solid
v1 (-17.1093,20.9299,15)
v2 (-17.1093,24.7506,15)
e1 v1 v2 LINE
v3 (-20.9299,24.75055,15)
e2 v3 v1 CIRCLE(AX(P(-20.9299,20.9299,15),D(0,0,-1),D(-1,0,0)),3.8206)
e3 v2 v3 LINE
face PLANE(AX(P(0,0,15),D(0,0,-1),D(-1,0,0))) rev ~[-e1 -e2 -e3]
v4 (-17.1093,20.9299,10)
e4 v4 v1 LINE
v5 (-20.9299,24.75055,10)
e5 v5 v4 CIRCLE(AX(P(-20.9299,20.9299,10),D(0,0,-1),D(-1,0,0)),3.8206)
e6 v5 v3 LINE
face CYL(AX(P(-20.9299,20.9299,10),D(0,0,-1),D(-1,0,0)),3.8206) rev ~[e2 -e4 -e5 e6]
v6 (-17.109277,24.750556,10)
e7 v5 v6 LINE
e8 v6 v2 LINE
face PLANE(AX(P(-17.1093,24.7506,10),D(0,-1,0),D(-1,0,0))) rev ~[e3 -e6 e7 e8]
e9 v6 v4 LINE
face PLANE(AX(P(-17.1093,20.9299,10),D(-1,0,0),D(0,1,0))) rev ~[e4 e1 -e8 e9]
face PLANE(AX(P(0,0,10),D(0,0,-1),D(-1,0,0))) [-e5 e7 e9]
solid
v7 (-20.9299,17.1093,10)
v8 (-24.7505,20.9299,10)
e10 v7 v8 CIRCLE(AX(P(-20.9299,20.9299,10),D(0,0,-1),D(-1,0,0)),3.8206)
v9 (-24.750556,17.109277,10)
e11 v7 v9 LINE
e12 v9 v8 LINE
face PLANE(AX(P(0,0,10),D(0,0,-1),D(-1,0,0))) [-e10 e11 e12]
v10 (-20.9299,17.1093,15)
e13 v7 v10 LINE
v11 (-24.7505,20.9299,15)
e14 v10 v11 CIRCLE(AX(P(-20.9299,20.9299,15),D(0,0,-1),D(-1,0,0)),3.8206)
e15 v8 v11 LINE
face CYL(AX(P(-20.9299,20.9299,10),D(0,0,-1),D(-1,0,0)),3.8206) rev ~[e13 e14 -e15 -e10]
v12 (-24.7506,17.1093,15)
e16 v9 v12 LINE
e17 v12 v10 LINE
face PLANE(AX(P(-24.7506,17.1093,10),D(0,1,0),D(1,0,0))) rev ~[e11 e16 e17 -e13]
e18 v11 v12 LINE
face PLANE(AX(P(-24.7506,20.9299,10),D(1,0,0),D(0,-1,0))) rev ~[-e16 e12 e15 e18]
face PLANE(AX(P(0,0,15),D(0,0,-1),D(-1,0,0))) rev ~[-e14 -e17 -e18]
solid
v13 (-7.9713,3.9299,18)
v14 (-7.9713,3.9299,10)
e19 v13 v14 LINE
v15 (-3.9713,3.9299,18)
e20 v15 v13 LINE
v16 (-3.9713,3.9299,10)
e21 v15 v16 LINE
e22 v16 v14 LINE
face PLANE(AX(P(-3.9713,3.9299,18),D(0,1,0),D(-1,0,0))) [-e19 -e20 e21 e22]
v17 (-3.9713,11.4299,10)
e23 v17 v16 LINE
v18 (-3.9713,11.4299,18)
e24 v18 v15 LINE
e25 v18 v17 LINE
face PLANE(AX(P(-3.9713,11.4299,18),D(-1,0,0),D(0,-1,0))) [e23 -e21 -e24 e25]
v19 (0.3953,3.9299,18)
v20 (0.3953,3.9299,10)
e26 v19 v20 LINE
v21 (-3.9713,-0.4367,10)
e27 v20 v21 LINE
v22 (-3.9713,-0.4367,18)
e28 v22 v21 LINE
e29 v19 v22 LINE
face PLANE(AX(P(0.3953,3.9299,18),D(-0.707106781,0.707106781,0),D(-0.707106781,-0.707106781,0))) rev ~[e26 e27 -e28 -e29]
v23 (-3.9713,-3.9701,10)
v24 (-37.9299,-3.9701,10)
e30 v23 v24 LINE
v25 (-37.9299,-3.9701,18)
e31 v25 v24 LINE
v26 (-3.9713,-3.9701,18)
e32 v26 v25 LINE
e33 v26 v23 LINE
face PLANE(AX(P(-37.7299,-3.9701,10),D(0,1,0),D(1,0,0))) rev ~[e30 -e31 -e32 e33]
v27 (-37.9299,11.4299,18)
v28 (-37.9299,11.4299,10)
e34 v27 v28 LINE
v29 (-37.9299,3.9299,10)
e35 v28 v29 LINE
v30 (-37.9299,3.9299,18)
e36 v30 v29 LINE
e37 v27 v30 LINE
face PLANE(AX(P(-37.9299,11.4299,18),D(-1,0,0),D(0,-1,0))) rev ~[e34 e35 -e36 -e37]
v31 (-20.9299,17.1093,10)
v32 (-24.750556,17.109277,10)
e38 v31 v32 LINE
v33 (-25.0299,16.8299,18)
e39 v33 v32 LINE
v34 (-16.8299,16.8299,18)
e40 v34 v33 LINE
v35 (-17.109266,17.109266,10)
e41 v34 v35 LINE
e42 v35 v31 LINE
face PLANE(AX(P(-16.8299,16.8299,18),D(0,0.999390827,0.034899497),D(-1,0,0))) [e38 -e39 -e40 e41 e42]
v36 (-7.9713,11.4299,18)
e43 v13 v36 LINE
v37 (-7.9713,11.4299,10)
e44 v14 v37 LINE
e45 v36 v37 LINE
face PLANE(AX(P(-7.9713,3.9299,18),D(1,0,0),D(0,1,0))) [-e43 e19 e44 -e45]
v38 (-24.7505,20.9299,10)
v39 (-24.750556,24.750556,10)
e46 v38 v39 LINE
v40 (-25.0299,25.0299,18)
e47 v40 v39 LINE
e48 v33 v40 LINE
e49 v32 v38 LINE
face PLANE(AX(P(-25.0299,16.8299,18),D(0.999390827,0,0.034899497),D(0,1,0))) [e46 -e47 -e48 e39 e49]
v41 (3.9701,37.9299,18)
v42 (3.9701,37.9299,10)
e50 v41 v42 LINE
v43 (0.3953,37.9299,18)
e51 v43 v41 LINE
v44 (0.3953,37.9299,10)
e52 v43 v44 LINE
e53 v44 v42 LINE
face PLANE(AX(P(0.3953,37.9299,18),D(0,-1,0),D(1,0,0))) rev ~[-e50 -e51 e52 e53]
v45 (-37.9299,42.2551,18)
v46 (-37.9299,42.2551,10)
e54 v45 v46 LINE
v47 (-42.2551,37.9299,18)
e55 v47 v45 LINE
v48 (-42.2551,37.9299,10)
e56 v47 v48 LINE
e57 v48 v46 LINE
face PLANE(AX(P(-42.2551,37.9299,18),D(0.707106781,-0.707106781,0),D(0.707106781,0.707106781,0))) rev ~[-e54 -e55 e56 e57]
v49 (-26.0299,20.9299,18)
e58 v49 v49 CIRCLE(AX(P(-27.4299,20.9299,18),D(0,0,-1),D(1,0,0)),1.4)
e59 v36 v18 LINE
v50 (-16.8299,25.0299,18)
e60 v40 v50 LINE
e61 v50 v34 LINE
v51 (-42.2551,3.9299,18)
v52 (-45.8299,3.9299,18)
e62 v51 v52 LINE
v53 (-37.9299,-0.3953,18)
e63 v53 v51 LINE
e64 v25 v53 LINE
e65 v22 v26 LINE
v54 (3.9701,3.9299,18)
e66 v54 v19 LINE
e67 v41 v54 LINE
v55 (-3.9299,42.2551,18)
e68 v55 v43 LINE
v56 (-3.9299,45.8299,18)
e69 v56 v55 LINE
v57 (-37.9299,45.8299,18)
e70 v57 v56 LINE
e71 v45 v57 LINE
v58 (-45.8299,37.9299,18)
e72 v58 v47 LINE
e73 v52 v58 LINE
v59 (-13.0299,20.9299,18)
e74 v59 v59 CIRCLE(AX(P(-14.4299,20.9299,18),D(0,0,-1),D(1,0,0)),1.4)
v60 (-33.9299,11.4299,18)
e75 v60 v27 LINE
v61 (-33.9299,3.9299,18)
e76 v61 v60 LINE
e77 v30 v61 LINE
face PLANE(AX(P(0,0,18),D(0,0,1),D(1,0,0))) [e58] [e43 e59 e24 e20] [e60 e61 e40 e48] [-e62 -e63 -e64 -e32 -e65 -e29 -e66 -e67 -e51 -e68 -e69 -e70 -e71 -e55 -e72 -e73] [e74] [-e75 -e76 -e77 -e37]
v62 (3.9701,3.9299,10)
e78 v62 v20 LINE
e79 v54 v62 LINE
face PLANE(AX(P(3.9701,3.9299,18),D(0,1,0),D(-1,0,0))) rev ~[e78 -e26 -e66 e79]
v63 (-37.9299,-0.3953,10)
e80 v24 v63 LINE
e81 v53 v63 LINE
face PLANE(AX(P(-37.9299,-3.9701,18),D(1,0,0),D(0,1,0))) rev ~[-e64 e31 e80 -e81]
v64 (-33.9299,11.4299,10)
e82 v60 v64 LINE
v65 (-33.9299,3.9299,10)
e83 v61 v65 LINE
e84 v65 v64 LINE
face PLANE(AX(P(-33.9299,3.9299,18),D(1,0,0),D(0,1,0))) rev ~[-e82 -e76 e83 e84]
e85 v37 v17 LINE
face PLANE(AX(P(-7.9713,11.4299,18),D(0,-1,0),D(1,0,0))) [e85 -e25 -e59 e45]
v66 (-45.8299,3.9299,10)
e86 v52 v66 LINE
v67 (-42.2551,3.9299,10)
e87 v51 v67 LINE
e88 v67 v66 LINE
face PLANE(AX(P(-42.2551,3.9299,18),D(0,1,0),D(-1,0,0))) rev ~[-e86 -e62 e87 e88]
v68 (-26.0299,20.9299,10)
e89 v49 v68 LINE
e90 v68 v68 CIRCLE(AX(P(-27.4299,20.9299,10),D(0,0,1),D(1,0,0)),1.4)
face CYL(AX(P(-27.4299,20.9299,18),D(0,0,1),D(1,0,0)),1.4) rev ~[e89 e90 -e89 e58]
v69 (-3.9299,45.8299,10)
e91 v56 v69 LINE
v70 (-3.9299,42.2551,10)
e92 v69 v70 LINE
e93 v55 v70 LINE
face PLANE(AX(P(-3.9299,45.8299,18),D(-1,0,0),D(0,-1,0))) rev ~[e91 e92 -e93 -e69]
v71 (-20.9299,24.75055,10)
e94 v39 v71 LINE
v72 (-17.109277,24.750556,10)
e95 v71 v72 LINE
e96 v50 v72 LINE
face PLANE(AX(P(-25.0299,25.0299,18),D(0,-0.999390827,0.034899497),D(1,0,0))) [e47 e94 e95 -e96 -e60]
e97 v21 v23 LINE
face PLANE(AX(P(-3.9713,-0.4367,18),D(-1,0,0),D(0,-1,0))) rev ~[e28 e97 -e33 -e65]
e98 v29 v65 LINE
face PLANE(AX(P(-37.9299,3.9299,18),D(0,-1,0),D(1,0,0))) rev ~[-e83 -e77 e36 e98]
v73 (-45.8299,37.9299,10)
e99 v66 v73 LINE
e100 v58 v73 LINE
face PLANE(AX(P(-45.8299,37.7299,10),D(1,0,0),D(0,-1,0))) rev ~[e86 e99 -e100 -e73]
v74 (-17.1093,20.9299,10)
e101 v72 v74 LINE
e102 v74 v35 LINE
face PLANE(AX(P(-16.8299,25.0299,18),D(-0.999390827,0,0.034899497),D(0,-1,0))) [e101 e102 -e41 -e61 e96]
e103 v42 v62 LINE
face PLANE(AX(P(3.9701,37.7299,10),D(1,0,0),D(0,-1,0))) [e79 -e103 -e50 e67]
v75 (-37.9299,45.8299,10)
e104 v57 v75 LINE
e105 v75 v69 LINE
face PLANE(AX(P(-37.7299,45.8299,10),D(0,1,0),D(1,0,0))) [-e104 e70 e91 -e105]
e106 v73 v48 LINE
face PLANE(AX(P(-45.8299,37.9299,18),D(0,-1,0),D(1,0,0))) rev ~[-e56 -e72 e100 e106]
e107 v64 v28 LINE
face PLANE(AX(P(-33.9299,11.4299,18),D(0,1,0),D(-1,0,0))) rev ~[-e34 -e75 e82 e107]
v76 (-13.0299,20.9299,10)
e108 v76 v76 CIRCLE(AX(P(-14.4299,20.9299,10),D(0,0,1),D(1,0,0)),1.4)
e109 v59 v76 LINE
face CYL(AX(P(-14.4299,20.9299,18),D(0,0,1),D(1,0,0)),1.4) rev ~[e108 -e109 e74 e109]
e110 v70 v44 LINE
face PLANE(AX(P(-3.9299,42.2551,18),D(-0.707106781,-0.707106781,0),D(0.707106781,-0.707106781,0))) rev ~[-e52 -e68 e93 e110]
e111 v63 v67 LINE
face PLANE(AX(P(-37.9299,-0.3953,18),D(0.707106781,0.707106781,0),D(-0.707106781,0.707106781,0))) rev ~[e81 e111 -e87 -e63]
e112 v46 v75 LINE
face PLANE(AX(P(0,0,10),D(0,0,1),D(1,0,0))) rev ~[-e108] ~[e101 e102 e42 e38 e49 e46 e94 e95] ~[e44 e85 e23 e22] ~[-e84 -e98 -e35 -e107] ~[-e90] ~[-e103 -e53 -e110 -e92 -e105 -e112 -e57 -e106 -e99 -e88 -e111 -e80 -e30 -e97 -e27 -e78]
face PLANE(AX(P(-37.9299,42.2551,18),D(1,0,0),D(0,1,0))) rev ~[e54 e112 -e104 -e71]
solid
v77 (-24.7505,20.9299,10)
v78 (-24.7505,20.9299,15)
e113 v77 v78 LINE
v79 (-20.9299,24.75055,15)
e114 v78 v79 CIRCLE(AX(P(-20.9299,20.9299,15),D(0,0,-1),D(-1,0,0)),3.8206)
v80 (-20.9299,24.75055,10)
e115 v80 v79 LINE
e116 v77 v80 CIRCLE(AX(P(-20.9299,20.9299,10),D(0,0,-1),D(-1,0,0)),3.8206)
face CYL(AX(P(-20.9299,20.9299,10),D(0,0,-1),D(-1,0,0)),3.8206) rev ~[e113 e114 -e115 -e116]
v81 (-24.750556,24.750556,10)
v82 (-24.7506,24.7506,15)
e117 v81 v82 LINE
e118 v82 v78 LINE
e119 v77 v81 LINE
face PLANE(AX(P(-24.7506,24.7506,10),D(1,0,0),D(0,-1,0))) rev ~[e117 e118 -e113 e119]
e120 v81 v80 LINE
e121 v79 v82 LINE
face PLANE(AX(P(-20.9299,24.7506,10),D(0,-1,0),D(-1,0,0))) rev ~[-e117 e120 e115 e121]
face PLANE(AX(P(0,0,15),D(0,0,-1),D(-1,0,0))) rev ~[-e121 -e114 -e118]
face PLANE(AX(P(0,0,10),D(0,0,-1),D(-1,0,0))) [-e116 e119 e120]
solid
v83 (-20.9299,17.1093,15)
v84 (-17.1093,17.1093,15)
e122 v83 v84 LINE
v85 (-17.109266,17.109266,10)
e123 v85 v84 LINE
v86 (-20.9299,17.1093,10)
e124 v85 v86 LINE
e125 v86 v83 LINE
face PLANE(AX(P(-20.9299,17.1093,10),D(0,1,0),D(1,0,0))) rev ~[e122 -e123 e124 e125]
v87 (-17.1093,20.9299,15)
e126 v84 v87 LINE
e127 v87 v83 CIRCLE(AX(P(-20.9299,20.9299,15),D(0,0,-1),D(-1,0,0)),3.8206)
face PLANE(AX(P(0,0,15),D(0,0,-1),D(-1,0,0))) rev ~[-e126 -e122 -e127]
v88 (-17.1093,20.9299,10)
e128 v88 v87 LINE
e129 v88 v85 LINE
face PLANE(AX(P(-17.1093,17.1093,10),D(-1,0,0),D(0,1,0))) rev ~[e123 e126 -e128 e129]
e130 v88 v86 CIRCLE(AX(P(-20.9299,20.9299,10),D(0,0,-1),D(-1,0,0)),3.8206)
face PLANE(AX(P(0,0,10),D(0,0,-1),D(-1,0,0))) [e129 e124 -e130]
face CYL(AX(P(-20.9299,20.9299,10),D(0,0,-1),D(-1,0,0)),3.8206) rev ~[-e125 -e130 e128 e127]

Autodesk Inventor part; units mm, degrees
ref_plane "YZ Plane" through (0, 0, 0) normal (1, 0, 0) x (0, 1, 0)
ref_plane "XZ Plane" through (0, 0, 0) normal (0, 1, 0) x (-1, 0, 0)
ref_plane "Work Plane1" through (0, 0, 10) normal (0, 0, 1) x (1, 0, 0)
sketch "Sketch1" plane through (0, 0, 10) normal (0, 0, 1) x (1, 0, 0)
  line L0 (-4.0299, -0.3538) -> (-2.2322, 1.4439) construction
  arc A0 (-1.4439, 2.2322) -> (-2.2322, 1.4439) centre (-0.9299, 0.9299) ccw construction
  line L1 (-1.4439, 2.2322) -> (0.3538, 4.0299) construction
  line L2 (-37.8299, 42.8299) -> (-37.8299, 37.8299) construction
  line L3 (-37.8299, 37.8299) -> (-42.9208, 37.8299) construction
  line L4 (-37.8299, 42.2137) -> (-37.8299, 45.8299) construction
  line L5 (-37.8299, 45.8299) -> (-4.0299, 45.8299) construction
  line L6 (-4.0299, 45.8299) -> (-4.0299, 42.2137) construction
  line L7 (-4.0299, 4.0299) -> (0.3538, 4.0299) projected
  circle A1 centre (-20.9299, 20.9299) radius 17.5 projected
  line L8 (-20.9299, 58.9723) -> (17.1124, 20.9299) construction
  line L9 (17.1124, 20.9299) -> (-20.9299, -17.1124) construction
  line L10 (-20.9299, -17.1124) -> (-58.9723, 20.9299) construction
  line L11 (-58.9723, 20.9299) -> (-20.9299, 58.9723) construction
  line L12 (-20.9299, 58.9723) -> (-20.9299, -17.1124) construction
  line L13 (17.1124, 20.9299) -> (-58.9723, 20.9299) construction
  line L14 (-20.9299, 58.9723) -> (32.8701, 58.9723) construction
  line L15 (-43.4299, 43.4299) -> (1.5701, 43.4299) construction
  line L16 (1.5701, 43.4299) -> (1.5701, -1.5701) construction
  line L17 (1.5701, -1.5701) -> (-43.4299, -1.5701) construction
  line L18 (-43.4299, -1.5701) -> (-43.4299, 43.4299) construction
  line L19 (-43.4299, 43.4299) -> (1.5701, -1.5701) construction
  line L20 (1.5701, 43.4299) -> (-43.4299, -1.5701) construction
  line L21 (-43.4299, 5.3876) -> (-43.4299, 36.4723)
  line L22 (-43.4299, 36.4723) -> (-36.4723, 43.4299)
  line L23 (-36.4723, 43.4299) -> (-5.3876, 43.4299)
  line L24 (-5.3876, 43.4299) -> (1.5701, 36.4723)
  line L25 (1.5701, 36.4723) -> (1.5701, 5.3876)
  line L26 (1.5701, 5.3876) -> (-5.3876, -1.5701)
  line L27 (-5.3876, -1.5701) -> (-36.4723, -1.5701)
  line L28 (-36.4723, -1.5701) -> (-43.4299, 5.3876)
  line L29 (-4.0299, 42.2137) -> (-37.8299, 42.2137) projected
  line L30 (-4.0299, -0.3538) -> (-4.0299, 4.0299) projected
  circle A2 centre (-20.9299, 20.9299) radius 1.5
  line L31 (-10.9299, 10.9299) -> (-30.9299, 10.9299) construction
  line L32 (-30.9299, 10.9299) -> (-30.9299, 30.9299) construction
  line L33 (-30.9299, 30.9299) -> (-10.9299, 30.9299) construction
  line L34 (-10.9299, 30.9299) -> (-10.9299, 10.9299) construction
  line L35 (-10.9299, 10.9299) -> (-30.9299, 30.9299) construction
  line L36 (-30.9299, 10.9299) -> (-10.9299, 30.9299) construction
  circle A3 centre (-30.9299, 30.9299) radius 1.4
  circle A4 centre (-30.9299, 10.9299) radius 1.4
  circle A5 centre (-10.9299, 10.9299) radius 1.4
  line L37 (-45.8299, 37.8299) -> (-42.0723, 37.8299) construction
  line L38 (-42.1723, 37.7299) -> (-45.8299, 37.7299)
  line L39 (-45.8299, 37.7299) -> (-45.8299, 4.1299)
  line L40 (-45.8299, 4.1299) -> (-42.1723, 4.1299)
  line L41 (-42.1723, 4.1299) -> (-42.1723, 37.7299)
  line L42 (-45.8299, 4.0299) -> (-42.0723, 4.0299) construction
  line L43 (-45.8299, 37.8299) -> (-42.0723, 37.8299) projected
  line L44 (-37.7299, 45.8299) -> (-4.1299, 45.8299)
  line L45 (-4.1299, 45.8299) -> (-4.1299, 42.1723)
  line L46 (-4.1299, 42.1723) -> (-37.7299, 42.1723)
  line L47 (-37.7299, 42.1723) -> (-37.7299, 45.8299)
  line L48 (0.4701, 37.8299) -> (0.4701, 4.0299) construction
  line L49 (0.4701, 4.0299) -> (3.9701, 4.0299) construction
  line L50 (3.9701, 37.8299) -> (3.9701, 4.0299) construction
  line L51 (0.4701, 37.8299) -> (3.9701, 37.8299) construction
  line L52 (-45.8299, -3.9701) -> (-4.0299, -3.9701) construction
  line L53 (0.3124, 37.7299) -> (3.9701, 37.7299)
  line L54 (3.9701, 37.7299) -> (3.9701, 4.1299)
  line L55 (3.9701, 4.1299) -> (0.3124, 4.1299)
  line L56 (0.3124, 4.1299) -> (0.3124, 37.7299)
  line L57 (-4.1713, -0.3538) -> (-37.7299, -0.3538)
  line L58 (-37.7299, -0.3538) -> (-37.7299, -3.9701)
  line L59 (-37.7299, -3.9701) -> (-4.1713, -3.9701)
  line L60 (-4.1713, -3.9701) -> (-4.1713, -0.3538)
  point P0 (-37.8299, 4.0299)
  dimension "d18" = 53.8
  dimension "d19" = 45
  dimension "d20" = 53.8
  dimension "d21" = 45
  dimension "d22" = 45
  dimension "d30" = 20
  dimension "d31" = 20
  dimension "d32" = 2.8
  dimension "d33" = 2.8
  dimension "d34" = 2.8
  dimension "d35" = 3
  dimension "d36" = 0.1
  dimension "d37" = 0.1
  dimension "d38" = 0.1
  dimension "d39" = 0.1
extrude "Extrusion1" add sketch "Sketch1" along normal blind 8 contours L30 L26 L57 L28 L41 L22 L46 L24 L56 L7 | L7 L26 L30 | L56 L24 L25 L26 | L26 L25 L24 L53 L54 L55 | L60 L59 L58 L57 L28 L27 L26 | L26 L27 L28 L57 | L46 L22 L29 L24 | L24 L29 L45 | L40 L39 L38 L22 L21 L28 | L28 L21 L22 L41 | L29 L22 L23 L24 | L24 L23 L22 L29 L47 L44 L45 | L47 L29 L22 | A1 | A2 | A3 | A4 | A5
sketch "Skizze4" plane through (0, 0, 18) normal (0, 0, 1) x (1, 0, 0)
  line L0 (-37.7299, 42.1723) -> (-42.1723, 37.7299) projected
  line L1 (-42.1723, 37.7299) -> (-45.8299, 37.7299) projected
  line L2 (-45.8299, 37.7299) -> (-45.8299, 4.1299) construction
  line L3 (-45.8299, 4.1299) -> (-42.1723, 4.1299) projected
  line L4 (-42.1723, 4.1299) -> (-37.6885, -0.3538) projected
  line L5 (-37.6885, -0.3538) -> (-37.7299, -0.3538) projected
  line L6 (-37.7299, -0.3538) -> (-37.7299, -3.9701) projected
  line L7 (-37.7299, -3.9701) -> (-4.1713, -3.9701) construction
  line L8 (-4.1713, -3.9701) -> (-4.1713, -0.3538) projected
  line L9 (-4.1713, -0.3538) -> (0.3124, 4.1299) projected
  line L10 (0.3124, 4.1299) -> (3.9701, 4.1299) projected
  line L11 (3.9701, 4.1299) -> (3.9701, 37.7299) construction
  line L12 (3.9701, 37.7299) -> (0.3124, 37.7299) projected
  line L13 (0.3124, 37.7299) -> (-4.1299, 42.1723) projected
  line L14 (-4.1299, 42.1723) -> (-4.1299, 45.8299) projected
  line L15 (-4.1299, 45.8299) -> (-37.7299, 45.8299) construction
  line L16 (-37.7299, 45.8299) -> (-37.7299, 42.1723) projected
  line L17 (-37.9299, 46.0299) -> (-3.9299, 46.0299) construction
  line L18 (-3.9299, 46.0299) -> (-3.9299, 42.2551)
  line L19 (-3.9299, 42.2551) -> (0.3953, 37.9299)
  line L20 (0.3953, 37.9299) -> (4.1701, 37.9299)
  line L21 (4.1701, 37.9299) -> (4.1701, 3.9299) construction
  line L22 (4.1701, 3.9299) -> (0.3953, 3.9299)
  line L23 (0.3953, 3.9299) -> (-3.9713, -0.4367)
  line L24 (-3.9713, -0.4367) -> (-3.9713, -4.1701)
  line L25 (-3.9713, -4.1701) -> (-37.9299, -4.1701) construction
  line L26 (-37.9299, -4.1701) -> (-37.9299, -0.3953)
  line L27 (-37.9299, -0.3953) -> (-42.2551, 3.9299)
  line L28 (-42.2551, 3.9299) -> (-46.0299, 3.9299)
  line L29 (-46.0299, 3.9299) -> (-46.0299, 37.9299) construction
  line L30 (-46.0299, 37.9299) -> (-42.2551, 37.9299)
  line L31 (-42.2551, 37.9299) -> (-37.9299, 42.2551)
  line L32 (-37.9299, 42.2551) -> (-37.9299, 46.0299)
  line L33 (-45.8299, 37.7299) -> (-45.8299, 37.9299)
  line L34 (-4.1299, 45.8299) -> (-37.7299, 45.8299) projected
  line L35 (-37.7299, 45.8299) -> (-37.9299, 45.8299)
  line L36 (-4.1299, 45.8299) -> (-3.9299, 45.8299)
  line L37 (3.9701, 37.7299) -> (3.9701, 37.9299)
  line L38 (3.9701, 4.1299) -> (3.9701, 37.7299) projected
  line L39 (3.9701, 4.1299) -> (3.9701, 3.9299)
  line L40 (-4.1713, -3.9701) -> (-3.9713, -3.9701)
  line L41 (-37.7299, -3.9701) -> (-37.9299, -3.9701)
  line L42 (-45.8299, 4.1299) -> (-45.8299, 3.9299)
  point P0 (0, 0)
  dimension "d40" = 0.2
extrude "IM_offset" add sketch "Skizze4" against normal up to surface (8 mm away)
sketch "Sketch24" plane through (0, 0, 18) normal (0, 0, 1) x (1, 0, 0)
  line L0 (-3.9299, 45.8299) -> (-37.9299, 45.8299) projected
  line L1 (-37.9299, 45.8299) -> (-37.9299, 42.2551) projected
  line L2 (-37.9299, 42.2551) -> (-42.2551, 37.9299) projected
  line L3 (-42.2551, 37.9299) -> (-45.8299, 37.9299) projected
  line L4 (-45.8299, 37.9299) -> (-45.8299, 3.9299) projected
  line L5 (-42.2551, 3.9299) -> (-45.8299, 3.9299) projected
  line L6 (-37.9299, -0.3953) -> (-42.2551, 3.9299) projected
  line L7 (-37.9299, -3.9701) -> (-37.9299, -0.3953) projected
  line L8 (-3.9713, -3.9701) -> (-37.9299, -3.9701) projected
  line L9 (-3.9713, -3.9701) -> (-3.9713, -0.4367) projected
  line L10 (-3.9713, -0.4367) -> (0.3953, 3.9299) projected
  line L11 (0.3953, 3.9299) -> (3.9701, 3.9299) projected
  line L12 (3.9701, 3.9299) -> (3.9701, 37.9299) projected
  line L13 (3.9701, 37.9299) -> (0.3953, 37.9299) projected
  line L14 (0.3953, 37.9299) -> (-3.9299, 42.2551) projected
  line L15 (-3.9299, 42.2551) -> (-3.9299, 45.8299) projected
  line L16 (-25.0299, 25.0299) -> (-16.8299, 25.0299)
  line L17 (-16.8299, 25.0299) -> (-16.8299, 16.8299)
  line L18 (-16.8299, 16.8299) -> (-25.0299, 16.8299)
  line L19 (-25.0299, 16.8299) -> (-25.0299, 25.0299)
  line L20 (-25.0299, 25.0299) -> (-16.8299, 16.8299) construction
  line L21 (-16.8299, 25.0299) -> (-25.0299, 16.8299) construction
  circle A0 centre (-20.9299, 20.9299) radius 24.9 construction
  point P0 (0, 0)
  point P1 (-20.9299, 20.9299)
  point P2 (-20.9299, 20.9299)
  dimension "d143" = 8.2
  dimension "d144" = 8.2
extrude "Extrusion20" cut sketch "Sketch24" against normal blind 10 draft -2 contours L16 L17 L18 L19
sketch "Skizze25" plane through (0, 0, 10) normal (0, 0, -1) x (-1, 0, 0)
  line L0 (24.7506, 24.7506) -> (24.7506, 17.1093) projected
  line L1 (24.7506, 17.1093) -> (17.1093, 17.1093) projected
  line L2 (17.1093, 17.1093) -> (17.1093, 24.7506) projected
  line L3 (17.1093, 24.7506) -> (24.7506, 24.7506) projected
  line L4 (3.9713, -3.9701) -> (37.9299, -3.9701) projected
  line L5 (37.9299, -3.9701) -> (37.9299, -0.3953) projected
  line L6 (37.9299, -0.3953) -> (42.2551, 3.9299) projected
  line L7 (42.2551, 3.9299) -> (45.8299, 3.9299) projected
  line L8 (45.8299, 3.9299) -> (45.8299, 37.9299) projected
  line L9 (45.8299, 37.9299) -> (42.2551, 37.9299) projected
  line L10 (42.2551, 37.9299) -> (37.9299, 42.2551) projected
  line L11 (37.9299, 42.2551) -> (37.9299, 45.8299) projected
  line L12 (37.9299, 45.8299) -> (3.9299, 45.8299) projected
  line L13 (3.9299, 45.8299) -> (3.9299, 42.2551) projected
  line L14 (3.9299, 42.2551) -> (-0.3953, 37.9299) projected
  line L15 (-0.3953, 37.9299) -> (-3.9701, 37.9299) projected
  line L16 (-3.9701, 37.9299) -> (-3.9701, 3.9299) projected
  line L17 (-3.9701, 3.9299) -> (-0.3953, 3.9299) projected
  line L18 (-0.3953, 3.9299) -> (3.9713, -0.4367) projected
  line L19 (3.9713, -0.4367) -> (3.9713, -3.9701) projected
  circle A0 centre (20.9299, 20.9299) radius 3.8206
  line L20 (24.7506, 24.7506) -> (17.1093, 24.7506)
  line L21 (17.1093, 24.7506) -> (17.1093, 17.1093)
  line L22 (17.1093, 17.1093) -> (24.7506, 17.1093)
  line L23 (24.7506, 17.1093) -> (24.7506, 24.7506)
  point P0 (0, 0)
  point P1 (17.1093, 20.9299)
  point P2 (20.9299, 24.7506)
  point P3 (24.7506, 20.9299)
  point P4 (20.9299, 17.1093)
extrude "Extrusion21" add sketch "Skizze25" against normal blind 5 contours L0 A0 L3 | L0 L1 A0 | A0 L2 L3 | L1 L2 A0
sketch "Skizze26" plane through (0, 0, 18) normal (0, 0, 1) x (1, 0, 0)
  line L0 (-25.0299, 16.8299) -> (-25.0299, 25.0299) projected
  line L1 (-25.0299, 25.0299) -> (-16.8299, 25.0299) projected
  line L2 (-16.8299, 25.0299) -> (-16.8299, 16.8299) projected
  line L3 (-16.8299, 16.8299) -> (-25.0299, 16.8299) projected
  line L4 (-3.9299, 45.8299) -> (-37.9299, 45.8299) projected
  line L5 (-37.9299, 45.8299) -> (-37.9299, 42.2551) projected
  line L6 (-37.9299, 42.2551) -> (-42.2551, 37.9299) projected
  line L7 (-42.2551, 37.9299) -> (-45.8299, 37.9299) projected
  line L8 (-45.8299, 37.9299) -> (-45.8299, 3.9299) projected
  line L9 (-42.2551, 3.9299) -> (-45.8299, 3.9299) projected
  line L10 (-37.9299, -0.3953) -> (-42.2551, 3.9299) projected
  line L11 (-37.9299, -3.9701) -> (-37.9299, -0.3953) projected
  line L12 (-3.9713, -3.9701) -> (-37.9299, -3.9701) projected
  line L13 (-3.9713, -3.9701) -> (-3.9713, -0.4367) projected
  line L14 (-3.9713, -0.4367) -> (0.3953, 3.9299) projected
  line L15 (0.3953, 3.9299) -> (3.9701, 3.9299) projected
  line L16 (3.9701, 3.9299) -> (3.9701, 37.9299) projected
  line L17 (3.9701, 37.9299) -> (0.3953, 37.9299) projected
  line L18 (0.3953, 37.9299) -> (-3.9299, 42.2551) projected
  line L19 (-3.9299, 42.2551) -> (-3.9299, 45.8299) projected
  arc A0 (-20.9299, 24.7506) -> (-24.7506, 20.9299) centre (-20.9299, 20.9299) ccw projected
  circle A1 centre (-20.9299, 20.9299) radius 6.5
  circle A2 centre (-27.4299, 20.9299) radius 1.4
  circle A3 centre (-14.4299, 20.9299) radius 1.4
  point P0 (0, 0)
  dimension "d152" = 13
  dimension "d153" = 2.8
  dimension "d154" = 2.8
extrude "Extrusion22" cut sketch "Skizze26" against normal through all contours A1 A3 | A1 A3 | A2 A1 | A1 A2
ref_plane "Arbeitsebene5" through (-37.9299, 20.9299, 10) normal (0, -1, 0) x (1, 0, 0)
ref_plane "Arbeitsebene6" through (-20.9299, 3.9299, 10) normal (-1, 0, 0) x (0, 0, 1)
sketch "Skizze27" plane through (0, 0, 18) normal (0, 0, 1) x (1, 0, 0)
  circle A0 centre (-14.4299, 20.9299) radius 1.4 projected
  circle A1 centre (-27.4299, 20.9299) radius 1.4 projected
  line L0 (-25.0299, 16.8299) -> (-25.0299, 25.0299) projected
  line L1 (-25.0299, 25.0299) -> (-16.8299, 25.0299) projected
  line L2 (-16.8299, 25.0299) -> (-16.8299, 16.8299) projected
  line L3 (-16.8299, 16.8299) -> (-25.0299, 16.8299) projected
  line L4 (-3.9299, 45.8299) -> (-37.9299, 45.8299) projected
  line L5 (-37.9299, 45.8299) -> (-37.9299, 42.2551) projected
  line L6 (-37.9299, 42.2551) -> (-42.2551, 37.9299) projected
  line L7 (-42.2551, 37.9299) -> (-45.8299, 37.9299) projected
  line L8 (-45.8299, 37.9299) -> (-45.8299, 3.9299) projected
  line L9 (-42.2551, 3.9299) -> (-45.8299, 3.9299) projected
  line L10 (-37.9299, -0.3953) -> (-42.2551, 3.9299) projected
  line L11 (-37.9299, -3.9701) -> (-37.9299, -0.3953) projected
  line L12 (-3.9713, -3.9701) -> (-37.9299, -3.9701) projected
  line L13 (-3.9713, -3.9701) -> (-3.9713, -0.4367) projected
  line L14 (-3.9713, -0.4367) -> (0.3953, 3.9299) projected
  line L15 (0.3953, 3.9299) -> (3.9701, 3.9299) projected
  line L16 (3.9701, 3.9299) -> (3.9701, 37.9299) projected
  line L17 (3.9701, 37.9299) -> (0.3953, 37.9299) projected
  line L18 (0.3953, 37.9299) -> (-3.9299, 42.2551) projected
  line L19 (-3.9299, 42.2551) -> (-3.9299, 45.8299) projected
  line L20 (-37.9299, 3.9299) -> (-33.9299, 3.9299)
  line L21 (-33.9299, 3.9299) -> (-33.9299, 11.4299)
  line L22 (-33.9299, 11.4299) -> (-37.9299, 11.4299)
  line L23 (-37.9299, 11.4299) -> (-37.9299, 3.9299)
  line L24 (-3.9713, 3.9299) -> (-7.9713, 3.9299)
  line L25 (-7.9713, 3.9299) -> (-7.9713, 11.4299)
  line L26 (-7.9713, 11.4299) -> (-3.9713, 11.4299)
  line L27 (-3.9713, 11.4299) -> (-3.9713, 3.9299)
  point P0 (0, 0)
  dimension "d157" = 4
  dimension "d158" = 7.5
  dimension "d159" = 4
extrude "Extrusion23" cut sketch "Skizze27" against normal blind 10 contours L23 L22 L21 L20 | L24 L25 L26 L27
properties part number "20_Cube_Insert_Filter_25mm"
